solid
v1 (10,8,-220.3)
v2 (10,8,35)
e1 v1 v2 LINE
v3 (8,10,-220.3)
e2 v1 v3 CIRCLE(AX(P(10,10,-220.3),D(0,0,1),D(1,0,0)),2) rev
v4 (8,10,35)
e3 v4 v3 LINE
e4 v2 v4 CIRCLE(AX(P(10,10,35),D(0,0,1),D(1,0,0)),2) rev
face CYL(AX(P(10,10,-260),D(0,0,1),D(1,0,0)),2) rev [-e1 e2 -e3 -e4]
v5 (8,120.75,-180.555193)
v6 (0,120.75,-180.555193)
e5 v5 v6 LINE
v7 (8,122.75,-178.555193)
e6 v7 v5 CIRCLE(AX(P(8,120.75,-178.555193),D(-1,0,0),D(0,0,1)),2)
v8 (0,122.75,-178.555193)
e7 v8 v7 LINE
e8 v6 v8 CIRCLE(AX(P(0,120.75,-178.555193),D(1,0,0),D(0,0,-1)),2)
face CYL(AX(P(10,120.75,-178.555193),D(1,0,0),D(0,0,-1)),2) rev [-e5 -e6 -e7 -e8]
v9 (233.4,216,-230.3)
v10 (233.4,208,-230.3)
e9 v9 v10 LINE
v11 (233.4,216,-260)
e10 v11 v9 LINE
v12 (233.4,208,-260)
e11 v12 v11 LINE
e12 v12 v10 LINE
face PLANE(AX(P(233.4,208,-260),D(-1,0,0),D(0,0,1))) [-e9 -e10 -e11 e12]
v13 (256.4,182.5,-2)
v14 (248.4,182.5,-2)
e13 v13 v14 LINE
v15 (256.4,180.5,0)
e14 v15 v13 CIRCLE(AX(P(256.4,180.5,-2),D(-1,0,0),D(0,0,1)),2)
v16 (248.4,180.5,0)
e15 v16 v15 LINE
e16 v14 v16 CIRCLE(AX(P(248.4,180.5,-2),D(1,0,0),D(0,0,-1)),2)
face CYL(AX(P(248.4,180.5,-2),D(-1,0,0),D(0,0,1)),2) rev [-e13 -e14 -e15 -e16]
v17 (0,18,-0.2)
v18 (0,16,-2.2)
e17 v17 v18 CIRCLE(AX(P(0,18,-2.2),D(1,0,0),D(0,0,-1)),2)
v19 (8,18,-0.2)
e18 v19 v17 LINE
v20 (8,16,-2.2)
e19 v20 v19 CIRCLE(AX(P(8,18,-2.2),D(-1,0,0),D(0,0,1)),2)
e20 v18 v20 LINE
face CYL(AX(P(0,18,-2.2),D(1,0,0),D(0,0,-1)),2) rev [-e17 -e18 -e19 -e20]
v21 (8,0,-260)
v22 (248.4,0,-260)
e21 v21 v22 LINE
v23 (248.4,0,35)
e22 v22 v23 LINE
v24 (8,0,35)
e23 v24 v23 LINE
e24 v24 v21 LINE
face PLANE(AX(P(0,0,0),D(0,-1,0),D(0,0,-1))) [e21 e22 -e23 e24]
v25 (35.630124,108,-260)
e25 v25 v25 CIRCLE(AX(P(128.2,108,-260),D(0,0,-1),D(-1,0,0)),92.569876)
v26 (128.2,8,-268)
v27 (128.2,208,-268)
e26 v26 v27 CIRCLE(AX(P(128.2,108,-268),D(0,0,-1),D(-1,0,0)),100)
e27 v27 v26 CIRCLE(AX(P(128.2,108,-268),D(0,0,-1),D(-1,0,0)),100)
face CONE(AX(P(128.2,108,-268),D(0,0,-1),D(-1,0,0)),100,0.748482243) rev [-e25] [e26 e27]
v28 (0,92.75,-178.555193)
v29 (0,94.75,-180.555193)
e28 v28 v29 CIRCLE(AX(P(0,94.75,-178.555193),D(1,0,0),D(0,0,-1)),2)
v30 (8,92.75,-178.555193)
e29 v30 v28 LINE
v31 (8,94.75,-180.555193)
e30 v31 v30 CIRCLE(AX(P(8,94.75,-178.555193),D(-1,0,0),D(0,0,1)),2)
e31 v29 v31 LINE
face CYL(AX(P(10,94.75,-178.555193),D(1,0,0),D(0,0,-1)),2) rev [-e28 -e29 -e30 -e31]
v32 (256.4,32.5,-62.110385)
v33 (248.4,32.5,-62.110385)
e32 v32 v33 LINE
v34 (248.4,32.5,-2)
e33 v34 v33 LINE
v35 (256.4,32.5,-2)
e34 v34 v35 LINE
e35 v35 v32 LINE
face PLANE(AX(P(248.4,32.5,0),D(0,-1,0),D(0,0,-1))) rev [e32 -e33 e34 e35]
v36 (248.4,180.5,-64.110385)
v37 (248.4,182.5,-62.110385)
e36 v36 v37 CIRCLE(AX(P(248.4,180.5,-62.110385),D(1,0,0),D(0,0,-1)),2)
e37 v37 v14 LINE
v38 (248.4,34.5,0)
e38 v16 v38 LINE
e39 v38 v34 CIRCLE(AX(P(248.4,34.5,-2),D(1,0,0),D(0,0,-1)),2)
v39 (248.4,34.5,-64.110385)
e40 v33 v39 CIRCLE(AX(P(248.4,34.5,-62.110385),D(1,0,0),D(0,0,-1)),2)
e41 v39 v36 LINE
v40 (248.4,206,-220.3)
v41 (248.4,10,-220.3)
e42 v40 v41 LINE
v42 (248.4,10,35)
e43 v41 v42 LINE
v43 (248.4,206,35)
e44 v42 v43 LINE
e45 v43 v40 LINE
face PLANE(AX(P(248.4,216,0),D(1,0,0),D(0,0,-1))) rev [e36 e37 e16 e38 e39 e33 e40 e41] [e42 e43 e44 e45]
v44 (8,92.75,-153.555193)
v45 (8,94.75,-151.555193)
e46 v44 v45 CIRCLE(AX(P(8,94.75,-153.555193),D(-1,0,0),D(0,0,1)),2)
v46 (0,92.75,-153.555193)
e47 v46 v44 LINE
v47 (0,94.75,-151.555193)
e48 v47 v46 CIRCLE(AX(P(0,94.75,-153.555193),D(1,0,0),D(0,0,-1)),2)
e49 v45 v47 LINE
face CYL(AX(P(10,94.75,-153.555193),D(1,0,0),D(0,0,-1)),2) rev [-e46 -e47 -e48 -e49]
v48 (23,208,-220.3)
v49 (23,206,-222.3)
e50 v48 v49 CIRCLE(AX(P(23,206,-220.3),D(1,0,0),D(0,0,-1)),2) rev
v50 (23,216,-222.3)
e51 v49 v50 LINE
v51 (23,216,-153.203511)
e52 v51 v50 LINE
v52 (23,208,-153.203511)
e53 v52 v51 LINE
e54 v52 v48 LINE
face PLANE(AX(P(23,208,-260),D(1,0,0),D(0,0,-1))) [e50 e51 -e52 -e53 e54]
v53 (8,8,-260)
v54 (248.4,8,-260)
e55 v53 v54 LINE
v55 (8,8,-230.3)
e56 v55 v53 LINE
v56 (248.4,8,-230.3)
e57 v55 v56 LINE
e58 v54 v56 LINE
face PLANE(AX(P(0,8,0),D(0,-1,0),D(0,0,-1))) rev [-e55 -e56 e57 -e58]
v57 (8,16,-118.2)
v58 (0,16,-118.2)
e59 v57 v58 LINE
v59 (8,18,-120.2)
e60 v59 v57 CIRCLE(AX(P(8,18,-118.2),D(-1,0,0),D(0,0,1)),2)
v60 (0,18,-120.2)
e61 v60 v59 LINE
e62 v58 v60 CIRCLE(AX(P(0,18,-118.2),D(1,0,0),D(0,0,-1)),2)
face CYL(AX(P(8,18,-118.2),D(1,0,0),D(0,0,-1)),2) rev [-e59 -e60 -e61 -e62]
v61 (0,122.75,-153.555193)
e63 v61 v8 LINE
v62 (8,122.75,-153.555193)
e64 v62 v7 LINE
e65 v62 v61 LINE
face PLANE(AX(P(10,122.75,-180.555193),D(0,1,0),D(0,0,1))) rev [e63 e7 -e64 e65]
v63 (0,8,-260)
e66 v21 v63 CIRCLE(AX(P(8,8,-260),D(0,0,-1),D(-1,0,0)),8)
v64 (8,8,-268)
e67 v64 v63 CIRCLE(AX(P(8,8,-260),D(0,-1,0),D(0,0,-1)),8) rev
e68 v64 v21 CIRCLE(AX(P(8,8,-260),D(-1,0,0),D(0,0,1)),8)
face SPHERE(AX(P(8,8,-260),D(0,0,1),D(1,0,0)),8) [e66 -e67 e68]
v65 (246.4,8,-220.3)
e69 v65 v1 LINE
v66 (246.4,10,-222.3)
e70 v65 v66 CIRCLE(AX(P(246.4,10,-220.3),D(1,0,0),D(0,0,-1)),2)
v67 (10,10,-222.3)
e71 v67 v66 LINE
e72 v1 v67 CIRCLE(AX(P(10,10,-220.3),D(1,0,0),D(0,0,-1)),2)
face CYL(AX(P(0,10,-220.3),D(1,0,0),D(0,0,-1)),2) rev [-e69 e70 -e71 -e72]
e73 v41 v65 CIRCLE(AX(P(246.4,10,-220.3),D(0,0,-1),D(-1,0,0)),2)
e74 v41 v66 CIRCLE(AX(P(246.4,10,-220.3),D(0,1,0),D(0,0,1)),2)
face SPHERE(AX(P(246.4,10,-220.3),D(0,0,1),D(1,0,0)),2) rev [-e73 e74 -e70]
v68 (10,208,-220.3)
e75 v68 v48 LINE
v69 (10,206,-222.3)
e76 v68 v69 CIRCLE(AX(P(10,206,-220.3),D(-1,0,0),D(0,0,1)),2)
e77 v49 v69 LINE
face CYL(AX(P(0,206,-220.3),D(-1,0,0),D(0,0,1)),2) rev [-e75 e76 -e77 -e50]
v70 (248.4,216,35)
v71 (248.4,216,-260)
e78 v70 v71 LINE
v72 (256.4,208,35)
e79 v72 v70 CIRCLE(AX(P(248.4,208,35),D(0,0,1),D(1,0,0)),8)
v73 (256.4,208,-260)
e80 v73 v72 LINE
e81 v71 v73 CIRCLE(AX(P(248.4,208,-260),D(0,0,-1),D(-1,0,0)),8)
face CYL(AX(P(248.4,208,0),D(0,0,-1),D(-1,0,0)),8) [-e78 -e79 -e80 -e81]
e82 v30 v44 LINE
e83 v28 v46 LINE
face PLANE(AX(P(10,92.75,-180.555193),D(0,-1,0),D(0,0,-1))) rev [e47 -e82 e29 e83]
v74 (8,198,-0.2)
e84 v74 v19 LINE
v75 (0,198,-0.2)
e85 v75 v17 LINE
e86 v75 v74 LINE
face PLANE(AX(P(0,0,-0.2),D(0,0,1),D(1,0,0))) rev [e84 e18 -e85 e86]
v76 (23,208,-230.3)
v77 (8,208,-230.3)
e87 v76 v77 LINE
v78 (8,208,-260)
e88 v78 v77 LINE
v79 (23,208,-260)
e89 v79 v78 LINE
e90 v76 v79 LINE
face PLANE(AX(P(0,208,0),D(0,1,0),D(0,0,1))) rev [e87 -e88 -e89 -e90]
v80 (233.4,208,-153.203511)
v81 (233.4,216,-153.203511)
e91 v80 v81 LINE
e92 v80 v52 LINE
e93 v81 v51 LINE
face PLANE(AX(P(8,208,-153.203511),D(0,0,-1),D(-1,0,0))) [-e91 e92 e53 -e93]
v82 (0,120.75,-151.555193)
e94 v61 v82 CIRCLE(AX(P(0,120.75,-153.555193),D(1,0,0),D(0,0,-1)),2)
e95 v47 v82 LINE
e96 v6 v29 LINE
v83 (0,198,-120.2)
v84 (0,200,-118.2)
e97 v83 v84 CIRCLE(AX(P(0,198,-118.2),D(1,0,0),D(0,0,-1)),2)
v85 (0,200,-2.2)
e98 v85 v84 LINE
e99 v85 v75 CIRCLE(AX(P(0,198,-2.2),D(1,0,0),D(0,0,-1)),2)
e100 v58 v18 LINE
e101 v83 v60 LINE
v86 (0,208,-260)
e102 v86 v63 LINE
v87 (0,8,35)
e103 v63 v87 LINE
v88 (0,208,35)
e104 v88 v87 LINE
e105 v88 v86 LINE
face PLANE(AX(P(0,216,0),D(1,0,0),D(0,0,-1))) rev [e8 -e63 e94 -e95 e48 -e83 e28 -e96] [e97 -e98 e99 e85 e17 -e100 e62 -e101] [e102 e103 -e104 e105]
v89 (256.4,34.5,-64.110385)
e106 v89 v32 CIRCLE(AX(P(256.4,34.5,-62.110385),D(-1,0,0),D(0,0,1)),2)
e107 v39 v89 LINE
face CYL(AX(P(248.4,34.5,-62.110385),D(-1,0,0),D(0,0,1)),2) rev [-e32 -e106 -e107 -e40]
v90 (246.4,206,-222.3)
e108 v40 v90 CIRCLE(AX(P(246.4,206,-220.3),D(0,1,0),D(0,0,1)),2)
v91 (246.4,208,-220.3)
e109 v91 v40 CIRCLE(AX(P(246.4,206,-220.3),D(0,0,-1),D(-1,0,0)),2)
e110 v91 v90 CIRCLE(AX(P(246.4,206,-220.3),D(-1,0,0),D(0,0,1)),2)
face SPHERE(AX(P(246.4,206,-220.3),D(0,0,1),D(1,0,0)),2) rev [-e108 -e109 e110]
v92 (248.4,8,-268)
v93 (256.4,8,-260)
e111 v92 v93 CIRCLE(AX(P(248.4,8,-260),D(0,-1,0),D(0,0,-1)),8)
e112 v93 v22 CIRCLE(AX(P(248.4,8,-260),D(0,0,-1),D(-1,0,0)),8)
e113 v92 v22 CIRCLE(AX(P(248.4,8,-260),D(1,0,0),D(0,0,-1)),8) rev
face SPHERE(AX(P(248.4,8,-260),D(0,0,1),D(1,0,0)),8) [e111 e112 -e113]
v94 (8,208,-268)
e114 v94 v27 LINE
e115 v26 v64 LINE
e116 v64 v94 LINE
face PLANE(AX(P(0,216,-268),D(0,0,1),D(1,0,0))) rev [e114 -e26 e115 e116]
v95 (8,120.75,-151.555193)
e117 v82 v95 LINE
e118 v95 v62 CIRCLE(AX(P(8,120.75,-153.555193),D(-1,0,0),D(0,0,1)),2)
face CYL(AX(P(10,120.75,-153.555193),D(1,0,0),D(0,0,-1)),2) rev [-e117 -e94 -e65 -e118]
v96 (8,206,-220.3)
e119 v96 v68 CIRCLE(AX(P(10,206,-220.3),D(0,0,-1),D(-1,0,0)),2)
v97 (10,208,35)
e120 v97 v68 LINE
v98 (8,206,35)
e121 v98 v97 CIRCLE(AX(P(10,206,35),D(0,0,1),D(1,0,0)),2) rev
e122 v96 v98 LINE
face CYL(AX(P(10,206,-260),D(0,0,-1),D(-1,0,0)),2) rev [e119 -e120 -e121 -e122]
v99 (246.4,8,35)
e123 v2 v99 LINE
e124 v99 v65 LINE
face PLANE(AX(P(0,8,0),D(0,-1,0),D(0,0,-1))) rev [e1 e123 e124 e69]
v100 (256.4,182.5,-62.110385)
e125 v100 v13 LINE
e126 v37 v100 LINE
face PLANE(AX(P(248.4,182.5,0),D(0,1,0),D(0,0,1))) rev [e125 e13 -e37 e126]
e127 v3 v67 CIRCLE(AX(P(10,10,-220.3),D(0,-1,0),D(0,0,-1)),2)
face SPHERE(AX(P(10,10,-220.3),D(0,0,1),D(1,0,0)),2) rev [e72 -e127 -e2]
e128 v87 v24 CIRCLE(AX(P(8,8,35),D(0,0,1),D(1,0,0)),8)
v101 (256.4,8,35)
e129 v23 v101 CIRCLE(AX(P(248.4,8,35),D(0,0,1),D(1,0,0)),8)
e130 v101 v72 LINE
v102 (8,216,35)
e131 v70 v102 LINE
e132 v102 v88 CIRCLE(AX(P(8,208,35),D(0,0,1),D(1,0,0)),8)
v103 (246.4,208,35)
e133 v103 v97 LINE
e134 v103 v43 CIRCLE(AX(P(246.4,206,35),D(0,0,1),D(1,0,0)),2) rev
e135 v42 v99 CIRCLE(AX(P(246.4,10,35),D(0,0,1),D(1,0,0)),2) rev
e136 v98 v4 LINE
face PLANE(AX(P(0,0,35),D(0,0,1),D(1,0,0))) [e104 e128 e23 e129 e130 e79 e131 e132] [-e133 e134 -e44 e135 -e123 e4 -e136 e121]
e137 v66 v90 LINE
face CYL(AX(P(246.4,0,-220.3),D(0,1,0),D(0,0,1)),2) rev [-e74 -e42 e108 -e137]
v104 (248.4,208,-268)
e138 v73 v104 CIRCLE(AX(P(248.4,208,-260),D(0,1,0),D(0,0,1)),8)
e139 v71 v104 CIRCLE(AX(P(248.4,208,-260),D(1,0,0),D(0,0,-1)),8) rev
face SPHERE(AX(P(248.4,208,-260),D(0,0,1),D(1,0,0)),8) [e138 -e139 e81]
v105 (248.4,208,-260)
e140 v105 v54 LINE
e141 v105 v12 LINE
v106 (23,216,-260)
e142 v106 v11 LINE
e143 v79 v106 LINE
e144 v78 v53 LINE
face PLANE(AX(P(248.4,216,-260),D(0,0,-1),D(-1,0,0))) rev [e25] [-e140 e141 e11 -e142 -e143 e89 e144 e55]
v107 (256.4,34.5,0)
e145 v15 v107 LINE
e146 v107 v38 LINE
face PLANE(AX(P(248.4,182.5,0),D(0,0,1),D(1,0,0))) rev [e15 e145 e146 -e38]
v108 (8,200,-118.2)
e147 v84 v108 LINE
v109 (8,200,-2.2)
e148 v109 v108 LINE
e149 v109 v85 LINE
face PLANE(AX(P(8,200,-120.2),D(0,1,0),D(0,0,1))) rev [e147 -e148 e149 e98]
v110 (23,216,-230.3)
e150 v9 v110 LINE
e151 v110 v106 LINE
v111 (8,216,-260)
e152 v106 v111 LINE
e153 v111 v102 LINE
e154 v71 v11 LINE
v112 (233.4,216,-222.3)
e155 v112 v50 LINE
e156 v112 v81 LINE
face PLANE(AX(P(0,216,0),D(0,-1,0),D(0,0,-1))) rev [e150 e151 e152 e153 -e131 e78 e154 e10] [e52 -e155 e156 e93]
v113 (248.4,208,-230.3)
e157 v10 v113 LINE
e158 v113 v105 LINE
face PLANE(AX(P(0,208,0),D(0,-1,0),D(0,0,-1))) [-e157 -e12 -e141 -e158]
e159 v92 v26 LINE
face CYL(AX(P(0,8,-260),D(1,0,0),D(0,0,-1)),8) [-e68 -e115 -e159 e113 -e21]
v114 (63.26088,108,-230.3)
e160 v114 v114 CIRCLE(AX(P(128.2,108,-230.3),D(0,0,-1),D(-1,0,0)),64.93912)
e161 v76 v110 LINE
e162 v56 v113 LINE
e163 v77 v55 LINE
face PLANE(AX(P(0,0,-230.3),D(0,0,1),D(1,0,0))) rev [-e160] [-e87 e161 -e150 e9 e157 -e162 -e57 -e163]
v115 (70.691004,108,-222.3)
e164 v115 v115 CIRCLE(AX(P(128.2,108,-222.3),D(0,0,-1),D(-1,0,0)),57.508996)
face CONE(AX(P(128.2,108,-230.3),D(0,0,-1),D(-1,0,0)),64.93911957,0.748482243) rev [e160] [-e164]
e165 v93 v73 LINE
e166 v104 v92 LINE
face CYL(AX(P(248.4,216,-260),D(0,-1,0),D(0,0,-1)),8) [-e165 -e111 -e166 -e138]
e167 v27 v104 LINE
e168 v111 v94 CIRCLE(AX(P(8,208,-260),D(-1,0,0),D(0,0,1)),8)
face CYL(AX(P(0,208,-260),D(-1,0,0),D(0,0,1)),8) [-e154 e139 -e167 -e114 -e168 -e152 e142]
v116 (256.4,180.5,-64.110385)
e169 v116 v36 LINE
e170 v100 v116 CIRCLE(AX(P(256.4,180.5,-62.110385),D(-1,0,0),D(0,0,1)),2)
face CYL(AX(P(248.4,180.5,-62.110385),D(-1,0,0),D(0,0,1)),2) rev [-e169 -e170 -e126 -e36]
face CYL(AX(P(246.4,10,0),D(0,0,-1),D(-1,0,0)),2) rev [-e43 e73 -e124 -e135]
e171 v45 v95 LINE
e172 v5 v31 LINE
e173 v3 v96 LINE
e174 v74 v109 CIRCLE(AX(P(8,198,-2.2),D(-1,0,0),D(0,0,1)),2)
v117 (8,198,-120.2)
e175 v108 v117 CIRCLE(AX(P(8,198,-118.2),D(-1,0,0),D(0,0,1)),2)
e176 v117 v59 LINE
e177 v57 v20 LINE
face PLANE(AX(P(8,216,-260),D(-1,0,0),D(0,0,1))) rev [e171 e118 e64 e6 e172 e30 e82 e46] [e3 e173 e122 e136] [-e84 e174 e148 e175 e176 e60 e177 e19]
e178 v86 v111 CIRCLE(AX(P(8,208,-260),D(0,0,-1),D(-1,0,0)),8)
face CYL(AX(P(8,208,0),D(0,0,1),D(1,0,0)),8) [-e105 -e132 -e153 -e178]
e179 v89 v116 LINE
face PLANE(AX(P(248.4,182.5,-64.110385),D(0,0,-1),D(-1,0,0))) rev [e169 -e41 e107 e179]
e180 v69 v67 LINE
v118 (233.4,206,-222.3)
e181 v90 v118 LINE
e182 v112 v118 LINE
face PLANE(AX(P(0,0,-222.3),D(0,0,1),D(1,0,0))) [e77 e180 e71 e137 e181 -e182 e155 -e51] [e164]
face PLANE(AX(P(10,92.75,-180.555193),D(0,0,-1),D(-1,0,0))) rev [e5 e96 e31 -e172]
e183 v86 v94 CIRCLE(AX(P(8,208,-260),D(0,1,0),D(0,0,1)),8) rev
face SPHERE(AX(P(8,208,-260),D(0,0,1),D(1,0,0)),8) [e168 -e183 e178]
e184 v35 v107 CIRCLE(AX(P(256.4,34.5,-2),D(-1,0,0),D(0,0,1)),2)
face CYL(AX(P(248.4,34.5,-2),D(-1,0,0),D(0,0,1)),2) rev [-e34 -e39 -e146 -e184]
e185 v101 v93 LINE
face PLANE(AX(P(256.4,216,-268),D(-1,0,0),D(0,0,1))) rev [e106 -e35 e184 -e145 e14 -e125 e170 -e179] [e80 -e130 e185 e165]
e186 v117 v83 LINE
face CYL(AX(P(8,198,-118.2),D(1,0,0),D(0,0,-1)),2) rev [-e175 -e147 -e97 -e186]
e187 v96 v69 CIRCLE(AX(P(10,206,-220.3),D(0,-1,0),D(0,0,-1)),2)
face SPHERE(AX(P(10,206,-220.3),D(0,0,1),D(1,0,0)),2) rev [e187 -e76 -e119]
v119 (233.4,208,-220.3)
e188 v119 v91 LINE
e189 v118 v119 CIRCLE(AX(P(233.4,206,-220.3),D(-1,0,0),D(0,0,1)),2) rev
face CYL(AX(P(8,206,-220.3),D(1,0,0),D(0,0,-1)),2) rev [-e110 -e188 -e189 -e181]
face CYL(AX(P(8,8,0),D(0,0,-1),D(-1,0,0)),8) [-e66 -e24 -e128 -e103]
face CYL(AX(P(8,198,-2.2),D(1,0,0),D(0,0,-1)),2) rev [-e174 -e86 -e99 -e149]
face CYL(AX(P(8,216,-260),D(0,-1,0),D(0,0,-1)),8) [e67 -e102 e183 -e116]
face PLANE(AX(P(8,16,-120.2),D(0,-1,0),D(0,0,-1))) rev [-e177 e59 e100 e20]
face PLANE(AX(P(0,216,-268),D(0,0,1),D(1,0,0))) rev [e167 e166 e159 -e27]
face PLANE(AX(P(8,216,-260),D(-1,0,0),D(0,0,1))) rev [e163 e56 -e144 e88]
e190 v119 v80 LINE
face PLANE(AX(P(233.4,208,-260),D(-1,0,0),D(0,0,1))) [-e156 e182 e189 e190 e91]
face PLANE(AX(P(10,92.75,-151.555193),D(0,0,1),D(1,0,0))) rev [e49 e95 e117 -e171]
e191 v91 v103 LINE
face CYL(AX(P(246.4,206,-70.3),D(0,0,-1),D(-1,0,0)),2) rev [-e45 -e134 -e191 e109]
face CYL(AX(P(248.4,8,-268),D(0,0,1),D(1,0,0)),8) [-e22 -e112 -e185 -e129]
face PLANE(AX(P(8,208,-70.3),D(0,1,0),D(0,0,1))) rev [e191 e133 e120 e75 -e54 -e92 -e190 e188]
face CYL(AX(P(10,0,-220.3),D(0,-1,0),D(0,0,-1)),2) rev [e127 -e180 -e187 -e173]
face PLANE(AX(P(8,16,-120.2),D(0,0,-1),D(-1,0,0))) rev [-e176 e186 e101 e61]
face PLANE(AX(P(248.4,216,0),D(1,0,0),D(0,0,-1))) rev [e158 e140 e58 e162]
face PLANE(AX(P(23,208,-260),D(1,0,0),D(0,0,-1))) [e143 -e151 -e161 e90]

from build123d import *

# Parameters (mm, degrees)
BOSS_EXTRUDE1_DEPTH = 216
SKETCH3_W           = 240.4
SKETCH3_H           = 260
BOSS_EXTRUDE2_DEPTH = 8
SKETCH4_R           = 100
CUT_EXTRUDE1_DEPTH  = 8
CUT_EXTRUDE1_DRAFT  = -42.88487357
SKETCH6_W           = 240.4
SKETCH6_H           = 208
BOSS_EXTRUDE3_DEPTH = 8
SKETCH7_R           = 64.93911957
CUT_EXTRUDE2_DEPTH  = 8
CUT_EXTRUDE2_DRAFT  = -42.88487357
SKETCH8_W           = 70.3
SKETCH8_H           = 200
CUT_EXTRUDE3_DEPTH  = 8
SKETCH9_W           = 256.4
SKETCH9_H           = 216
SKETCH9_W_2         = 240.4
SKETCH9_H_2         = 200
BOSS_EXTRUDE4_DEPTH = 35.2
SKETCH12_W          = 240.4
SKETCH12_H          = 153.003510621
BOSS_EXTRUDE6_DEPTH = 8
SKETCH13_W          = 64.11038507
SKETCH13_H          = 150
CUT_EXTRUDE6_DEPTH  = 8
SKETCH15_W          = 49.9
SKETCH15_H          = 184
CUT_EXTRUDE8_DEPTH  = 8
SKETCH16_W          = 70.2
SKETCH16_H          = 8
SKETCH16_W_2        = 70.1
BOSS_EXTRUDE7_DEPTH = 8
SKETCH19_W          = 15
SKETCH19_H          = 106.796489379
BOSS_EXTRUDE8_DEPTH = 8
FILLET2_R           = 8
FILLET3_R           = 2
FILLET4_R           = 2
FILLET5_R           = 2
SKETCH20_W          = 29
SKETCH20_H          = 30
CUT_EXTRUDE9_DEPTH  = 10
FILLET6_R           = 2


with BuildPart() as part:
    # Sketch2 → Boss-Extrude1 (new body)
    with BuildSketch(Plane(origin=(0, 0, 0), x_dir=(1, 0, 0), z_dir=(0, 1, 0))):
        Polygon((256.4, 0), (248.4, 0), (248.4, 260), (8, 260), (8, 0), (0, 0), (0, 268), (256.4, 268), align=None)
    extrude(amount=BOSS_EXTRUDE1_DEPTH)

    # Sketch3 → Boss-Extrude2 (add)
    with BuildSketch(Plane.XZ):
        with Locations((128.2, -130)):
            Rectangle(SKETCH3_W, SKETCH3_H)
    extrude(amount=-BOSS_EXTRUDE2_DEPTH)


with BuildPart() as cut_extrude1_tool:
    # Sketch4 → Cut-Extrude1 (with draft: the straight prism first)
    with BuildSketch(Plane(origin=(0, 0, -268), x_dir=(-1, 0, 0), z_dir=(0, 0, -1))):
        with Locations((-128.2, 108)):
            Circle(SKETCH4_R)
    extrude(amount=-CUT_EXTRUDE1_DEPTH)
    # Cut-Extrude1: the draft: its side faces are tilted about the plane it starts from
    cut_extrude1_sides = [cut_extrude1_tool.faces().sort_by_distance(p)[0] for p in [
        (228.2, 108, -264),
    ]]
    draft(cut_extrude1_sides, Plane(origin=(0, 0, -268), x_dir=(-1, 0, 0), z_dir=(0, 0, -1)), CUT_EXTRUDE1_DRAFT)


with BuildPart() as part_1:
    add(part.part)

    # Cut-Extrude1: cut by cut_extrude1_tool
    add(cut_extrude1_tool.part, mode=Mode.SUBTRACT)

    # Sketch6 → Boss-Extrude3 (add)
    with BuildSketch(Plane.XY.offset(-230.3)):
        with Locations((128.2, 112)):
            Rectangle(SKETCH6_W, SKETCH6_H)
    extrude(amount=BOSS_EXTRUDE3_DEPTH)


with BuildPart() as cut_extrude2_tool:
    # Sketch7 → Cut-Extrude2 (with draft: the straight prism first)
    with BuildSketch(Plane(origin=(0, 0, -230.3), x_dir=(-1, 0, 0), z_dir=(0, 0, -1))):
        with Locations((-128.2, 108)):
            Circle(SKETCH7_R)
    extrude(amount=-CUT_EXTRUDE2_DEPTH)
    # Cut-Extrude2: the draft: its side faces are tilted about the plane it starts from
    cut_extrude2_sides = [cut_extrude2_tool.faces().sort_by_distance(p)[0] for p in [
        (193.13911957, 108, -226.3),
    ]]
    draft(cut_extrude2_sides, Plane(origin=(0, 0, -230.3), x_dir=(-1, 0, 0), z_dir=(0, 0, -1)), CUT_EXTRUDE2_DRAFT)


with BuildPart() as part_2:
    add(part_1.part)

    # Cut-Extrude2: cut by cut_extrude2_tool
    add(cut_extrude2_tool.part, mode=Mode.SUBTRACT)

    # Sketch8 → Cut-Extrude3 (cut)
    with BuildSketch(Plane.ZY):
        with Locations((-35.15, 108)):
            Rectangle(SKETCH8_W, SKETCH8_H)
    extrude(amount=-CUT_EXTRUDE3_DEPTH, mode=Mode.SUBTRACT)

    # Sketch9 → Boss-Extrude4 (add)
    with BuildSketch(Plane.XY.offset(35)):
        with Locations((128.2, 108)):
            Rectangle(SKETCH9_W, SKETCH9_H)
        with Locations((128.2, 108)):
            Rectangle(SKETCH9_W_2, SKETCH9_H_2, mode=Mode.SUBTRACT)
    extrude(amount=-BOSS_EXTRUDE4_DEPTH)

    # Sketch12 → Boss-Extrude6 (add)
    with BuildSketch(Plane(origin=(0, 216, 0), x_dir=(1, 0, 0), z_dir=(0, 1, 0))):
        with Locations((128.2, 76.701755311)):
            Rectangle(SKETCH12_W, SKETCH12_H)
    extrude(amount=-BOSS_EXTRUDE6_DEPTH)

    # Sketch13 → Cut-Extrude6 (cut)
    with BuildSketch(Plane(origin=(256.4, 0, 0), x_dir=(0, 0, -1), z_dir=(1, 0, 0))):
        with Locations((32.055192535, 107.5)):
            Rectangle(SKETCH13_W, SKETCH13_H)
    extrude(amount=-CUT_EXTRUDE6_DEPTH, mode=Mode.SUBTRACT)

    # Sketch15 → Cut-Extrude8 (cut)
    with BuildSketch(Plane.ZY):
        with Locations((-95.25, 108)):
            Rectangle(SKETCH15_W, SKETCH15_H)
    extrude(amount=-CUT_EXTRUDE8_DEPTH, mode=Mode.SUBTRACT)

    # Sketch16 → Boss-Extrude7 (add)
    with BuildSketch(Plane.ZY):
        with Locations((-35.2, 12)):
            Rectangle(SKETCH16_W, SKETCH16_H)
        with Locations((-35.25, 204)):
            Rectangle(SKETCH16_W_2, SKETCH16_H)
    extrude(amount=-BOSS_EXTRUDE7_DEPTH)

    # Sketch19 → Boss-Extrude8 (add)
    with BuildSketch(Plane(origin=(0, 216, 0), x_dir=(1, 0, 0), z_dir=(0, 1, 0))):
        with Locations((15.5, 206.601755311)):
            Rectangle(SKETCH19_W, SKETCH19_H)
        with Locations((240.9, 206.601755311)):
            Rectangle(SKETCH19_W, SKETCH19_H)
    extrude(amount=-BOSS_EXTRUDE8_DEPTH)

    # Fillet2
    fillet2_edges = [part_2.edges().sort_by_distance(p)[0] for p in [
        (0, 0, -116.5),
        (0, 108, -268),
        (256.4, 108, -268),
        (256.4, 216, -116.5),
        (128.2, 216, -268),
        (0, 216, -116.5),
        (128.2, 0, -268),
        (256.4, 0, -116.5),
    ]]
    fillet(fillet2_edges, radius=FILLET2_R - 0.0001)  # a hair under: the kernel refuses the full size

    # Fillet3
    fillet3_edges = [part_2.edges().sort_by_distance(p)[0] for p in [
        (8, 208, -93.65),
        (248.4, 208, -93.65),
        (248.4, 8, -93.65),
        (8, 8, -93.65),
    ]]
    fillet(fillet3_edges, radius=FILLET3_R)

    # Fillet4
    fillet4_edges = [part_2.edges().sort_by_distance(p)[0] for p in [
        (16.5, 208, -222.3),
        (239.9, 208, -222.3),
        (248.4, 108, -222.3),
        (128.2, 8, -222.3),
        (8, 108, -222.3),
        (8.585786438, 207.414213562, -222.3),
        (247.814213562, 207.414213562, -222.3),
        (8.585786438, 8.585786438, -222.3),
        (247.814213562, 8.585786438, -222.3),
    ]]
    fillet(fillet4_edges, radius=FILLET4_R)

    # Fillet5
    fillet5_edges = [part_2.edges().sort_by_distance(p)[0] for p in [
        (252.4, 32.5, 0),
        (252.4, 182.5, 0),
        (252.4, 182.5, -64.11038507),
        (252.4, 32.5, -64.11038507),
        (4, 16, -120.2),
        (4, 200, -120.2),
        (4, 16, -0.2),
        (4, 200, -0.2),
    ]]
    fillet(fillet5_edges, radius=FILLET5_R)

    # Sketch20 → Cut-Extrude9 (cut)
    with BuildSketch(Plane.ZY):
        with Locations((-166.055192535, 107.75)):
            Rectangle(SKETCH20_W, SKETCH20_H)
    extrude(amount=-CUT_EXTRUDE9_DEPTH, mode=Mode.SUBTRACT)

    # Fillet6
    fillet6_edges = [part_2.edges().sort_by_distance(p)[0] for p in [
        (4, 122.75, -151.555192535),
        (4, 92.75, -151.555192535),
        (4, 92.75, -180.555192535),
        (4, 122.75, -180.555192535),
    ]]
    fillet(fillet6_edges, radius=FILLET6_R)


solid = part_2.part
